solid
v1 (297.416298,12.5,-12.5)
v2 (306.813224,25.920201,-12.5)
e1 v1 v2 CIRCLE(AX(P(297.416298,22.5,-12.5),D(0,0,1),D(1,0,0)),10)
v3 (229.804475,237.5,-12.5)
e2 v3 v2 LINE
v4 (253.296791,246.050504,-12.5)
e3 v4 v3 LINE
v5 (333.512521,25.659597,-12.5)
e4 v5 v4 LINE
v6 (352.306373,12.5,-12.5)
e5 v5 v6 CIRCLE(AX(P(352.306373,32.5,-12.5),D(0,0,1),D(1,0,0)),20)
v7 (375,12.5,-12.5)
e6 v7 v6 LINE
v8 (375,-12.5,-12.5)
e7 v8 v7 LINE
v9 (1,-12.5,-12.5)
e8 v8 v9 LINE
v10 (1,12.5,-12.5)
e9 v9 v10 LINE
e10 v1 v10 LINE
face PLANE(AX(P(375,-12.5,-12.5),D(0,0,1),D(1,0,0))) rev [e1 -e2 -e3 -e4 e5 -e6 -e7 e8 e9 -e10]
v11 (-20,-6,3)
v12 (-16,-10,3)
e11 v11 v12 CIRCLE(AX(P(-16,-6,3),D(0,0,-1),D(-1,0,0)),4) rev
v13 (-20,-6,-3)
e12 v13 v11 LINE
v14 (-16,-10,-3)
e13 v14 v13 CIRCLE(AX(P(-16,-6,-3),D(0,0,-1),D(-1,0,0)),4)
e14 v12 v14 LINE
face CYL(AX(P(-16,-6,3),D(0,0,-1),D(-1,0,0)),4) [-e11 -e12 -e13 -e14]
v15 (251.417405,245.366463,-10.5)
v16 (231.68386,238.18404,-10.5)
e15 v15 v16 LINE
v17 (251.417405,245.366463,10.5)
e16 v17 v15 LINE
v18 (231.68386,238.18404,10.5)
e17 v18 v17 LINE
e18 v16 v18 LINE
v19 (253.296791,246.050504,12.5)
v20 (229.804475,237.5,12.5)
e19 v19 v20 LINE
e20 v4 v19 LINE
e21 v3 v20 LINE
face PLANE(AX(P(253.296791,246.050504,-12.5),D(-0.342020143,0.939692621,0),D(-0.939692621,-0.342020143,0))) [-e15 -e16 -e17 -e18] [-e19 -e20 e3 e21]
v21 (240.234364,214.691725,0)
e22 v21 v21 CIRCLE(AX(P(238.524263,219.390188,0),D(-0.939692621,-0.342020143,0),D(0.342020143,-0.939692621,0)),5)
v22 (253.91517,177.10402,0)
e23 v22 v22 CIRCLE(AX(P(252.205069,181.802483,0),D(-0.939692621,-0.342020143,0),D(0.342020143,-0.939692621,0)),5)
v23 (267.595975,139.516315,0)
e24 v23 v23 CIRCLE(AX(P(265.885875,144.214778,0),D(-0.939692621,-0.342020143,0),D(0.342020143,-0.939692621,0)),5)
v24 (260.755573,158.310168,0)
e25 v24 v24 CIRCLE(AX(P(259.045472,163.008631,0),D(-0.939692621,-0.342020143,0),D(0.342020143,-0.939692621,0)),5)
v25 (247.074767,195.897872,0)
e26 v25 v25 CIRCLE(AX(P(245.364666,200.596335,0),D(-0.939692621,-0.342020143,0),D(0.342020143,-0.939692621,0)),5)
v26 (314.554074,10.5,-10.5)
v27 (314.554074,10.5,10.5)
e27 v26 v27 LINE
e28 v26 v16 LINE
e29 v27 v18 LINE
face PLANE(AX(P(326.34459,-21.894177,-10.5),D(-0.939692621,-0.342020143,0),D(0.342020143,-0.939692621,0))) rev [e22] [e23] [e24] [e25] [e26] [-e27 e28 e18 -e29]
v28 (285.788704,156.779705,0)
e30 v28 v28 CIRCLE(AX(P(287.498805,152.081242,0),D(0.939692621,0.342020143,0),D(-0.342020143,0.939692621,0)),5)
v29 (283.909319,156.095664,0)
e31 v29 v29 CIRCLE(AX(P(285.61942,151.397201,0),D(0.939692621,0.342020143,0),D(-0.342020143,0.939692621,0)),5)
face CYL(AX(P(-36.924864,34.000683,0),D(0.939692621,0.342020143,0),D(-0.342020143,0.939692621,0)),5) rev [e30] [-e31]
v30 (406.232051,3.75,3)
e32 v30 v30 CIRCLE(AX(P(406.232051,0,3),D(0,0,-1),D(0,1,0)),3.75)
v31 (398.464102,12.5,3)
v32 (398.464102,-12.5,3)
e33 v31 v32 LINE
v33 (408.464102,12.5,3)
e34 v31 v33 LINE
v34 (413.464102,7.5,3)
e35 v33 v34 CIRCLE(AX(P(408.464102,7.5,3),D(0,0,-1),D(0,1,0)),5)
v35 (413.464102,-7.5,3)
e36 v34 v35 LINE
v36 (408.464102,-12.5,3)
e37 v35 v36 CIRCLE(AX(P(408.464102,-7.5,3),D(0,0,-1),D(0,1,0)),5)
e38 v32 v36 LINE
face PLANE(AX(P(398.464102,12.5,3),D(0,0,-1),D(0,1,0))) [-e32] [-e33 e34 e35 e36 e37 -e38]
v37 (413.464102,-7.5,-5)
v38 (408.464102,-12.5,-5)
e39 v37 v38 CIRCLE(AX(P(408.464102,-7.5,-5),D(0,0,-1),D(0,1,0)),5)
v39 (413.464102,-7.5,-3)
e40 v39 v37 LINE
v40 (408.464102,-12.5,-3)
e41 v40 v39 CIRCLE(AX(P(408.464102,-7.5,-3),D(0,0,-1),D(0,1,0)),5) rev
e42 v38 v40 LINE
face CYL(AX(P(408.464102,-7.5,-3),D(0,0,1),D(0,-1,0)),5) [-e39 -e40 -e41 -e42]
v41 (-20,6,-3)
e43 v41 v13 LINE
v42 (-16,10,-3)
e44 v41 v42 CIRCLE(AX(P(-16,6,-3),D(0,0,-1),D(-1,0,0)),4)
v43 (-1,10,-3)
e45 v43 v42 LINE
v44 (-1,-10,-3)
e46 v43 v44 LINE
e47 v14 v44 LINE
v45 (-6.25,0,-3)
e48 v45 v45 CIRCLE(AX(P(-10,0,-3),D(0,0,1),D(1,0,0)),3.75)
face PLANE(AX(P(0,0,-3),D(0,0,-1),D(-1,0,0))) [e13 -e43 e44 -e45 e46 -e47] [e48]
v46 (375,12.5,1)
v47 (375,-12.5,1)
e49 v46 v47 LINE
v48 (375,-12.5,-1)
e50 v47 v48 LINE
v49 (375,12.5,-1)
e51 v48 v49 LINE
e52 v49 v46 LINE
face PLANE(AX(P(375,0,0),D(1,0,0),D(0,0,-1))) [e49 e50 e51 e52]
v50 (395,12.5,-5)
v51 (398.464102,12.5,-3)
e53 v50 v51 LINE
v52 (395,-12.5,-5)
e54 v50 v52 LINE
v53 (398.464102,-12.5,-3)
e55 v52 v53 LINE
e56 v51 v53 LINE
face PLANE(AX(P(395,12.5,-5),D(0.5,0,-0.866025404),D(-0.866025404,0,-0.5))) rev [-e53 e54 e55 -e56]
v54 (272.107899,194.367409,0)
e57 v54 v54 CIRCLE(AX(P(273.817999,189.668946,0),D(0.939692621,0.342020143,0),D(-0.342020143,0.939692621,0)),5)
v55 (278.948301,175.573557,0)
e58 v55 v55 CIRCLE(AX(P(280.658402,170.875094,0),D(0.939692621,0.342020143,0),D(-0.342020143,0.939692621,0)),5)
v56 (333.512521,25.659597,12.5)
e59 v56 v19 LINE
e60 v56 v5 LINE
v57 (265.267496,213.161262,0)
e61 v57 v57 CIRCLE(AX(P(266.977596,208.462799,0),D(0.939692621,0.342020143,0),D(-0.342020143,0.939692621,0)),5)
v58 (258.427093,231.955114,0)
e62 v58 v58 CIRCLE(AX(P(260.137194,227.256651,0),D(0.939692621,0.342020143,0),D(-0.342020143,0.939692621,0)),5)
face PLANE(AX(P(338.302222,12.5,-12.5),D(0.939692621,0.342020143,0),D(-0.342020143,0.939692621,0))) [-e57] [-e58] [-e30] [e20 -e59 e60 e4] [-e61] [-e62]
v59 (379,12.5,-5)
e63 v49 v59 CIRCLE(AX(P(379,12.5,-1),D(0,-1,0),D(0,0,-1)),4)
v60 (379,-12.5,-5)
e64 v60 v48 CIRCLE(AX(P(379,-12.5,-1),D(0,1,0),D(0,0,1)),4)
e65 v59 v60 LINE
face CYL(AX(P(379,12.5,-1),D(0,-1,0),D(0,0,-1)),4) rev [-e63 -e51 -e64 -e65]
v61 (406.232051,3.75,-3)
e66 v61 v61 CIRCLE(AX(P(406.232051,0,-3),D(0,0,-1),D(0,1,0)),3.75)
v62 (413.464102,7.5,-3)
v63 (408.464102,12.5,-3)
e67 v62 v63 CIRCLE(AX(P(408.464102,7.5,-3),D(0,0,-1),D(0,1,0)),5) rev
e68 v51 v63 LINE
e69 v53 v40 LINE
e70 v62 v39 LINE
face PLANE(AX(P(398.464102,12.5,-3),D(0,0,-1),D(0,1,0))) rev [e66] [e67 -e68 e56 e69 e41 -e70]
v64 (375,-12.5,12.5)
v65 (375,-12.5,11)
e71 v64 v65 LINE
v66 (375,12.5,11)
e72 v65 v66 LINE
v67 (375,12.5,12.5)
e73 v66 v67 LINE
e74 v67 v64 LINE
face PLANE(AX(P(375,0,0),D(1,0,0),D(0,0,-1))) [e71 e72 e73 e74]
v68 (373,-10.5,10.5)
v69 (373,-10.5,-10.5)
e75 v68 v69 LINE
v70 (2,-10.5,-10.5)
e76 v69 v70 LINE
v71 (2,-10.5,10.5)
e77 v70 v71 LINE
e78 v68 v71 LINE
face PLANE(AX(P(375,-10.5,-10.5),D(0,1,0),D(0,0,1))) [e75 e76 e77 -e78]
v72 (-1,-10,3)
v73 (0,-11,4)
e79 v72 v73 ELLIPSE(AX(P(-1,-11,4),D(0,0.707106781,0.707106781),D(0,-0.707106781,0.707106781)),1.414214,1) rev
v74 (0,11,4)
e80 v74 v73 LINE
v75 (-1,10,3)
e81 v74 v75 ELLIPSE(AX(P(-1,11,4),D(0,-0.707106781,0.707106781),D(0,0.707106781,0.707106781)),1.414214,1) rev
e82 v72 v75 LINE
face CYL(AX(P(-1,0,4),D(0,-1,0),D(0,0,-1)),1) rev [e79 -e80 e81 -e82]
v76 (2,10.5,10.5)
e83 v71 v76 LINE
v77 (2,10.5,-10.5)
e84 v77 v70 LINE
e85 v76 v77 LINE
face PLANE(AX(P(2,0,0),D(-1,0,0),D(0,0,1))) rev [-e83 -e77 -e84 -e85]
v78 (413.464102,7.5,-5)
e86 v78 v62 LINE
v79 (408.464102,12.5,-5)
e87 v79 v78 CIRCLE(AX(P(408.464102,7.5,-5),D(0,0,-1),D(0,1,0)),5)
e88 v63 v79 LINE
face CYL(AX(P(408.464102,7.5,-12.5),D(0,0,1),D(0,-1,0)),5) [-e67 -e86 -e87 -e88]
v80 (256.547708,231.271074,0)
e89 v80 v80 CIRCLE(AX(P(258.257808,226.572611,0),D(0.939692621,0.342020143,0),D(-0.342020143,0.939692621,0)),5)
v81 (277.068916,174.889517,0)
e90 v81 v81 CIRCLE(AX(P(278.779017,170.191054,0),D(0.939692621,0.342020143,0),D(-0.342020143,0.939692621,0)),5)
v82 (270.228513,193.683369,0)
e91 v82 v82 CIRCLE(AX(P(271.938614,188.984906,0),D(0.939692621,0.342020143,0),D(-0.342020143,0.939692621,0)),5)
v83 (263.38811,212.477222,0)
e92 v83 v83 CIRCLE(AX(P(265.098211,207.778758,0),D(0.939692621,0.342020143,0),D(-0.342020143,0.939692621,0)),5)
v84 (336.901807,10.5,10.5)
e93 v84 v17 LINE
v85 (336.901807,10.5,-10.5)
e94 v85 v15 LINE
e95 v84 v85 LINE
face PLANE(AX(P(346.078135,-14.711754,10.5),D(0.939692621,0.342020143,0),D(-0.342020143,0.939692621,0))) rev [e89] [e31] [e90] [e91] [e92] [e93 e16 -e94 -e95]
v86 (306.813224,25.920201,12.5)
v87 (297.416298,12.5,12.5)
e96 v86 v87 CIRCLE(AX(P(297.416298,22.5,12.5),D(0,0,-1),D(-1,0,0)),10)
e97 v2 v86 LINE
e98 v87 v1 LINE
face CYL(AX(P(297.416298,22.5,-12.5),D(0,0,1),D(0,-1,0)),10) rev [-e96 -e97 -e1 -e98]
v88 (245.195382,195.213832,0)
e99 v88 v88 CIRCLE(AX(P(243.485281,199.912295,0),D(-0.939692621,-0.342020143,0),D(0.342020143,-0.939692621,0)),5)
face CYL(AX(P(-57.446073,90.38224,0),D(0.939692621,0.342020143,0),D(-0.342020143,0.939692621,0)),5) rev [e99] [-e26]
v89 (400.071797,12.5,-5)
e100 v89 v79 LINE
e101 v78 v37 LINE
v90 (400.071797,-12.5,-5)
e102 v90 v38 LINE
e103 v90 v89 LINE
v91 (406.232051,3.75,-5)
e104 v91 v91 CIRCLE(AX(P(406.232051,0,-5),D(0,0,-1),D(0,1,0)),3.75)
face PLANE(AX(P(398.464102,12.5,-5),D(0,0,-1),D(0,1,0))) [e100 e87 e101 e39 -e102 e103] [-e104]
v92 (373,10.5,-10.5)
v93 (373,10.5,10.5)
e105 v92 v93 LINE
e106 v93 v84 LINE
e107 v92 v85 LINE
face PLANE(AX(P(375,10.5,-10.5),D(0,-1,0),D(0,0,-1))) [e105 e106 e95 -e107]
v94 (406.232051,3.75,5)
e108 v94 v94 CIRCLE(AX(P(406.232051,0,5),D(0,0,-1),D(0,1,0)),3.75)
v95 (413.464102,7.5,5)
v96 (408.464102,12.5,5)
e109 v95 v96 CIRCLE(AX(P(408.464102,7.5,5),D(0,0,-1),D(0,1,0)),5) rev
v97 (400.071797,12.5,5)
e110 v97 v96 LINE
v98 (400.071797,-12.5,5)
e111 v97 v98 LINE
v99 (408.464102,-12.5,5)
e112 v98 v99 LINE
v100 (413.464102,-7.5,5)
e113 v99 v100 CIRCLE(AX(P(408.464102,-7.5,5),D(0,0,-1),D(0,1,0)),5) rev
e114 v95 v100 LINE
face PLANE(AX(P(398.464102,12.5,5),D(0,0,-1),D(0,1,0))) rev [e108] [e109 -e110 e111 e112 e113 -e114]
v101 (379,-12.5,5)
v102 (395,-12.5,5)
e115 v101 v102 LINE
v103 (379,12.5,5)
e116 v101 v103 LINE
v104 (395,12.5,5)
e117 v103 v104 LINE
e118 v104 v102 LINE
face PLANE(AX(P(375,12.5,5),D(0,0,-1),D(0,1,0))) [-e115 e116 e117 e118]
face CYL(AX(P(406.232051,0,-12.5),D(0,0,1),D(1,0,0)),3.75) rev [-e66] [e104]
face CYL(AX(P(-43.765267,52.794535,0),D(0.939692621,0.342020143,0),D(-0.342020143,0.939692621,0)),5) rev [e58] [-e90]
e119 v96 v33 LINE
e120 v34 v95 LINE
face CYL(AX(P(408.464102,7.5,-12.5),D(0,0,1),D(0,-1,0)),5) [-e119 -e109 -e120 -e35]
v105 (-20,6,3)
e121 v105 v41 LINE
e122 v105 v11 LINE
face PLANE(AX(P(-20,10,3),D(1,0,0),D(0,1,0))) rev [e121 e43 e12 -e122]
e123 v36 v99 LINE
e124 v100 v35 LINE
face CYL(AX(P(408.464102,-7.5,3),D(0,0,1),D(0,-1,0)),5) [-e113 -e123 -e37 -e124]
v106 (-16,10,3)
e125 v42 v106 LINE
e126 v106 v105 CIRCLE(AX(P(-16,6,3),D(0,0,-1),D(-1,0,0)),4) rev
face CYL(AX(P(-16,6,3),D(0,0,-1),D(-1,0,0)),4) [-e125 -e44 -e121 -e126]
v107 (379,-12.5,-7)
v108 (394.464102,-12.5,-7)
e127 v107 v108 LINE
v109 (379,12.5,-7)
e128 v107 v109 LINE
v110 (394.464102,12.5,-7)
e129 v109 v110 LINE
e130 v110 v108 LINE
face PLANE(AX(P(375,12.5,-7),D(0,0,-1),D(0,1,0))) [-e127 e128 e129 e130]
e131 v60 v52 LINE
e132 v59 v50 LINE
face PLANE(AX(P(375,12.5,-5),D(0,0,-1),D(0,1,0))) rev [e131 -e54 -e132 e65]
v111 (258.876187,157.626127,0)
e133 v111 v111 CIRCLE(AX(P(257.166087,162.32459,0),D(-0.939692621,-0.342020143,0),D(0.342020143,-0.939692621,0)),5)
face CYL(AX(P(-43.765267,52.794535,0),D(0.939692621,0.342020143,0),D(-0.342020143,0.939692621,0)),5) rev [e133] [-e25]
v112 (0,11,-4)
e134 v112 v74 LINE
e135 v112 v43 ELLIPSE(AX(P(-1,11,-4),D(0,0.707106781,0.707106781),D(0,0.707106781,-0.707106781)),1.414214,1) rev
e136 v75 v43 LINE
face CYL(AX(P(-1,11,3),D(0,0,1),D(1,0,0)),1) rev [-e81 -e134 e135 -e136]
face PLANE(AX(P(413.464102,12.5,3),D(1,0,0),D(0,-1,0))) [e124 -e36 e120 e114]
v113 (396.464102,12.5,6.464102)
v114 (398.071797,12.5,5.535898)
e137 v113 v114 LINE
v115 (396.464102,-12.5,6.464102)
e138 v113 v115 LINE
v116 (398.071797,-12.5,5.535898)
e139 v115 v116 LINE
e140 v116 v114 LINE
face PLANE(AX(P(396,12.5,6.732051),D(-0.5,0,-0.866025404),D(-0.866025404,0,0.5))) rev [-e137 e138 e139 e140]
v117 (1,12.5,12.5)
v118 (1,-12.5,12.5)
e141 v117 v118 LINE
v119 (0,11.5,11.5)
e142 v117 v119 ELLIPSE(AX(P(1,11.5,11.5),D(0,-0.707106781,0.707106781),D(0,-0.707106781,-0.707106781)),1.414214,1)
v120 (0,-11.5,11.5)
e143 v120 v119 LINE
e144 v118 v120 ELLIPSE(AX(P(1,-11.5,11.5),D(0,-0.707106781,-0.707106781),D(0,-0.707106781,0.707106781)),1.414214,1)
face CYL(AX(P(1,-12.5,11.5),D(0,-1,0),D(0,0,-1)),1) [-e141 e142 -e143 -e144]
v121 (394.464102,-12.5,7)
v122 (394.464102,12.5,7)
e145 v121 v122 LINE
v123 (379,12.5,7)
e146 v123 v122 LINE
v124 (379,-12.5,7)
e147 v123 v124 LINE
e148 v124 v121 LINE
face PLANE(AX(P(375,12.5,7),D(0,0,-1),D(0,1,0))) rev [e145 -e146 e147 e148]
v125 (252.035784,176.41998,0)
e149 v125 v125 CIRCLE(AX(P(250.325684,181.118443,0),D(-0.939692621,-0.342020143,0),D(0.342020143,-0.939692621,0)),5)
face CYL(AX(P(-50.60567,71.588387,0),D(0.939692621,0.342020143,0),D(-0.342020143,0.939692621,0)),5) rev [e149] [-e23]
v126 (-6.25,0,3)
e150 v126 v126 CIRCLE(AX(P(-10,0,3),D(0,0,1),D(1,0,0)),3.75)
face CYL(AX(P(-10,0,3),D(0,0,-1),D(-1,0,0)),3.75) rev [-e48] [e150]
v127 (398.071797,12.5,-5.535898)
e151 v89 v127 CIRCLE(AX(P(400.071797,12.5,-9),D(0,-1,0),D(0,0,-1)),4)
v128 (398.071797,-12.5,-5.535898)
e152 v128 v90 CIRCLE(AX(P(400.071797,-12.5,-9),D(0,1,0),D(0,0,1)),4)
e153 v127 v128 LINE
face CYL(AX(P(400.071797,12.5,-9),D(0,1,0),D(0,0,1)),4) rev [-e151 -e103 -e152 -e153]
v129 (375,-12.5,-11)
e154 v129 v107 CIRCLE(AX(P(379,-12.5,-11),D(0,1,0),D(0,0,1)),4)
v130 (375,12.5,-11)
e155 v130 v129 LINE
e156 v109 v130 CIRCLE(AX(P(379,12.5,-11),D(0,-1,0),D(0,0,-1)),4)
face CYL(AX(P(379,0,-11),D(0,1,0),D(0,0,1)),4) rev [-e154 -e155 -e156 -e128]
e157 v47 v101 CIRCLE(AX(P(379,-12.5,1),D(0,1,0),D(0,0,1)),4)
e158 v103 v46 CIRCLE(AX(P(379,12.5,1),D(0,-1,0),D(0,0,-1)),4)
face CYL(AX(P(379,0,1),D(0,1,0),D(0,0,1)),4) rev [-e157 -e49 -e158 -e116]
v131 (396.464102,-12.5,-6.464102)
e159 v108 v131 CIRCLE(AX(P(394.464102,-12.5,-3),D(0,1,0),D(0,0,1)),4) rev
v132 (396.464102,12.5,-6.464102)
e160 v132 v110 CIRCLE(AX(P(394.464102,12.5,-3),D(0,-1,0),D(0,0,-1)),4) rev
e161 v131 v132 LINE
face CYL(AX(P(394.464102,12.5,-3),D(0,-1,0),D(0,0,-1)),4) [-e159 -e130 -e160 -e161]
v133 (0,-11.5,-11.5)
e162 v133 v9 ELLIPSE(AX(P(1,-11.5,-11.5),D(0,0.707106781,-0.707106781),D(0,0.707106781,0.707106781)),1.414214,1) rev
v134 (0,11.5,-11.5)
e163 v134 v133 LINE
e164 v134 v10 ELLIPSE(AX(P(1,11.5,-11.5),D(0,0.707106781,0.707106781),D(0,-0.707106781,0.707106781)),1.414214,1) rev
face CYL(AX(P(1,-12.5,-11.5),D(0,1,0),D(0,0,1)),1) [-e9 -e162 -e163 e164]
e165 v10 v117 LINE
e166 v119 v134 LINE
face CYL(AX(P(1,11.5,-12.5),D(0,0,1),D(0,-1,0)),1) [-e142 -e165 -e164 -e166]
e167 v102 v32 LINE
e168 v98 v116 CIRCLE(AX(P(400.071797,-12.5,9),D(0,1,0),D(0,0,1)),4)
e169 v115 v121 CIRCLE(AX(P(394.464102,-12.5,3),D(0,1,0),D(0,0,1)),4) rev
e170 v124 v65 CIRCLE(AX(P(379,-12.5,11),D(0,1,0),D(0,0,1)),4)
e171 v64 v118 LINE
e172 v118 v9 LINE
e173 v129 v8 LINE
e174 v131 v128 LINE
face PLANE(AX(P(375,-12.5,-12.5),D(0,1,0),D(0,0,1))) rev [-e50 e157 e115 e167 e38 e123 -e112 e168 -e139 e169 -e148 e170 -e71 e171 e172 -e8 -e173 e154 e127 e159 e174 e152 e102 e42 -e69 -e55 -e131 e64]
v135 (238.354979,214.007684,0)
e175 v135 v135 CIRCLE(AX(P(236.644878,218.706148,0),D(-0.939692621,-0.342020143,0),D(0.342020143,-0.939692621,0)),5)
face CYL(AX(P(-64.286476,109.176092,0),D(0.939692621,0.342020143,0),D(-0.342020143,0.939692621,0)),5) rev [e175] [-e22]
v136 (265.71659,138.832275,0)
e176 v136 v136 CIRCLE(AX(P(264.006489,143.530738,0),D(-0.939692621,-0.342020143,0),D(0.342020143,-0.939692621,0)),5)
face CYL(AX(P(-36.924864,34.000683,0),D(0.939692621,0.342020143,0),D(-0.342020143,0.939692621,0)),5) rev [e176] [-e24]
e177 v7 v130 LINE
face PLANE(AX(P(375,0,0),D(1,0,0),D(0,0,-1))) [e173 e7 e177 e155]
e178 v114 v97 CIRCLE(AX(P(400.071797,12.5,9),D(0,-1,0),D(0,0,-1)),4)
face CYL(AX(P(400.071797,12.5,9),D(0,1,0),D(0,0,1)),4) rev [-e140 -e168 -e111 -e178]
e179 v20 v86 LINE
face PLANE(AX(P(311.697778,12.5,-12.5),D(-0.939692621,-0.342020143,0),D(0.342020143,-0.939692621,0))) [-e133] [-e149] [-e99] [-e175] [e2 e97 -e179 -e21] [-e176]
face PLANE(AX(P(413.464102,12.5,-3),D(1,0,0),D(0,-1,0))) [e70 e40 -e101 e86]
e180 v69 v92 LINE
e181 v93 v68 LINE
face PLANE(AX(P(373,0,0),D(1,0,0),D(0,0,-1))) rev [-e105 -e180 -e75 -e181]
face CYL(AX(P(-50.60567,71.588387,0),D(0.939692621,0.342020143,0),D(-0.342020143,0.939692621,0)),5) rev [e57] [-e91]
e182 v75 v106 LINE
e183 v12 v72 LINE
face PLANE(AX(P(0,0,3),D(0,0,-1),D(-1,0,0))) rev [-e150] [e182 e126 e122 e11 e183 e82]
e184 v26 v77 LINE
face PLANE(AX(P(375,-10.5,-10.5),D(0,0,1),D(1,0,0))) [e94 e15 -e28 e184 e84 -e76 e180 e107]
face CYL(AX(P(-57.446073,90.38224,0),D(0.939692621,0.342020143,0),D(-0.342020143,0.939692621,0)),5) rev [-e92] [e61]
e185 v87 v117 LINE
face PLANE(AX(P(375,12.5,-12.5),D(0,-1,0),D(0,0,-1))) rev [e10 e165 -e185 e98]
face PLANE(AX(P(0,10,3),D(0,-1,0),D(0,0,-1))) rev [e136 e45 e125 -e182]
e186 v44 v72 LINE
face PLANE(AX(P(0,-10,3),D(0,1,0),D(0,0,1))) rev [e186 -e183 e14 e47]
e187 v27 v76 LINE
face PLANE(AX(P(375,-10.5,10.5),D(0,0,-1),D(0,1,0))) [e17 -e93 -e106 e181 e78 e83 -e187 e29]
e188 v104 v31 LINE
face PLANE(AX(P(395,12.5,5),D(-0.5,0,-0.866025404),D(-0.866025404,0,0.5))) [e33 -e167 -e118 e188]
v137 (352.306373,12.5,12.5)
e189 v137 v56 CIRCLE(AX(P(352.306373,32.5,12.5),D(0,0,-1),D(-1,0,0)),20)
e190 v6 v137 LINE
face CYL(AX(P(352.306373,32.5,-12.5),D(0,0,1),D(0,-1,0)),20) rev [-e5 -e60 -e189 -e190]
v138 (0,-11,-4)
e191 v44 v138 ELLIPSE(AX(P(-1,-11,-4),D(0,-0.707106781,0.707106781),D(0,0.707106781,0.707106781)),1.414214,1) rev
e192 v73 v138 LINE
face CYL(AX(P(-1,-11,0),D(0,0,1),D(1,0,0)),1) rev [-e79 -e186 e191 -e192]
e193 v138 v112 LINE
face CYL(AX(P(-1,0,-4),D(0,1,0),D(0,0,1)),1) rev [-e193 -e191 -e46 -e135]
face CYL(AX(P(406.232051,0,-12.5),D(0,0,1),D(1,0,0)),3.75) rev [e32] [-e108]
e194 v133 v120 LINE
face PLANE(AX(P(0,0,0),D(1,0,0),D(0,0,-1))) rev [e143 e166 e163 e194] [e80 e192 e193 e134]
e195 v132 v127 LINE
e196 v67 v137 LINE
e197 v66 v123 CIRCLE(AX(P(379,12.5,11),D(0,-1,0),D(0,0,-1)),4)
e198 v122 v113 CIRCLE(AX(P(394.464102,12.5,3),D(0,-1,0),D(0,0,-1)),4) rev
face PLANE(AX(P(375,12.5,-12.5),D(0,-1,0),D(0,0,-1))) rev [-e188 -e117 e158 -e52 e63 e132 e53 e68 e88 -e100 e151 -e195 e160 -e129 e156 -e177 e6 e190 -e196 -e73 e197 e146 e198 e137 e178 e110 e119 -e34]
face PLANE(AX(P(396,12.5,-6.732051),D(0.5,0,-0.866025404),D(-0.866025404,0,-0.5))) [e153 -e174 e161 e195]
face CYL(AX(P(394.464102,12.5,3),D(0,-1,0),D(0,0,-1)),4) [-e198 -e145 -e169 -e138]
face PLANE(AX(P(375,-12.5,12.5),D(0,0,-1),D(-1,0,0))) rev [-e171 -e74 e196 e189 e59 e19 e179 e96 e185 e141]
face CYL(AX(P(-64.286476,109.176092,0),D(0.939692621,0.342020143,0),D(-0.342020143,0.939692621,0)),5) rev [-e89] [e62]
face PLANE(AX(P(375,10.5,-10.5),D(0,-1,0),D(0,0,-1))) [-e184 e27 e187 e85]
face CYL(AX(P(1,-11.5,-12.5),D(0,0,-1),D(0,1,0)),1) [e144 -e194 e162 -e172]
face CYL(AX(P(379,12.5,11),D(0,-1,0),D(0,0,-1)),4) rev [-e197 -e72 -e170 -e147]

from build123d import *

# Parameters (mm, degrees)
SKETCH1_W                = 25
SKETCH1_H                = 25
SKETCH1_W_2              = 21
SKETCH1_H_2              = 21
BOSS_EXTRUDE1_DEPTH      = 375
SKETCH2_W                = 25
SKETCH2_H                = 25
BOSS_EXTRUDE2_DEPTH      = 2
SKETCH3_W                = 20
SKETCH3_H                = 20
SKETCH3_R                = 3.75
BOSS_EXTRUDE3_DEPTH      = 3
FILLET1_R                = 1
FILLET2_R                = 4
BOSS_EXTRUDE4_DEPTH      = 12.5
BOSS_EXTRUDE4_DEPTH_BACK = 12.5
CUT_EXTRUDE1_REACH       = 451.804
SKETCH5_W                = 21
SKETCH5_H                = 21
FILLET3_R                = 20
FILLET4_R                = 10
SKETCH6_W                = 25
SKETCH6_H                = 25
BOSS_EXTRUDE5_DEPTH      = 2
THICKEN1_START           = -12.5
THICKEN1_DEPTH           = 25
THICKEN2_START           = -12.5
THICKEN2_DEPTH           = 25
CUT_EXTRUDE2_DEPTH       = 482.455775371
CUT_EXTRUDE2_DEPTH_BACK  = 482.455775371
SKETCH9_R                = 3.75
FILLET6_R                = 4
FILLET7_R                = 5
CUT_EXTRUDE3_DEPTH       = 351.398422086
CUT_EXTRUDE3_DEPTH_BACK  = 351.398422086
SKETCH10_R               = 5


# Read off the part's stored shape, not the designer's step: Thicken1, Thicken2
with BuildPart() as part:
    # Sketch1 → Boss-Extrude1 (new body)
    with BuildSketch(Plane(origin=(0, 0, 0), x_dir=(0, 0, -1), z_dir=(1, 0, 0))):
        Rectangle(SKETCH1_W, SKETCH1_H)
        Rectangle(SKETCH1_W_2, SKETCH1_H_2, mode=Mode.SUBTRACT)
    extrude(amount=BOSS_EXTRUDE1_DEPTH)

    # Sketch2 → Boss-Extrude2 (add)
    with BuildSketch(Plane.ZY):
        Rectangle(SKETCH2_W, SKETCH2_H)
    extrude(amount=-BOSS_EXTRUDE2_DEPTH)

    # Sketch3 → Boss-Extrude3 (add, symmetric)
    with BuildSketch(Plane.XY):
        with Locations((-10, 0)):
            Rectangle(SKETCH3_W, SKETCH3_H)
        with Locations((-10, 0)):
            Circle(SKETCH3_R, mode=Mode.SUBTRACT)
    extrude(amount=BOSS_EXTRUDE3_DEPTH, both=True)

    # Fillet1
    fillet1_edges = [part.edges().sort_by_distance(p)[0] for p in [
        (0, 12.5, 0),
        (0, 0, -12.5),
        (0, 0, 3),
        (0, 0, -3),
        (0, -10, 0),
        (0, 10, 0),
        (0, -12.5, 0),
        (0, 0, 12.5),
    ]]
    fillet(fillet1_edges, radius=FILLET1_R)

    # Fillet2
    fillet2_edges = [part.edges().sort_by_distance(p)[0] for p in [
        (-20, 10, 0),
        (-20, -10, 0),
    ]]
    fillet(fillet2_edges, radius=FILLET2_R)

    # Sketch4 → Boss-Extrude4 (add, two sides: drawn at the far end of the back side and taken through both)
    with BuildSketch(Plane.XY.offset(-BOSS_EXTRUDE4_DEPTH_BACK)):
        Polygon((338.302222156, 12.5), (253.296790654, 246.050503583), (229.804475134, 237.5), (311.697777844, 12.5), align=None)
    extrude(amount=BOSS_EXTRUDE4_DEPTH + BOSS_EXTRUDE4_DEPTH_BACK)

    # Cut-Extrude1: up to this plane
    cut_extrude1_end = Plane(origin=(375, 10.5, -10.5), z_dir=(0, -1, 0))
    # Sketch5 → Cut-Extrude1 (cut, up to the surface)
    with BuildSketch(Plane(origin=(-49.449011673, 135.860042987, 0), x_dir=(0, 0, 1), z_dir=(-0.3420201433256653, 0.9396926207859098, 0)), mode=Mode.PRIVATE) as cut_extrude1_sk1:
        with Locations((0, 309.675353547)):
            Rectangle(SKETCH5_W, SKETCH5_H)
    cut_extrude1_tool1 = split(extrude(cut_extrude1_sk1.sketch, amount=-CUT_EXTRUDE1_REACH, mode=Mode.PRIVATE), bisect_by=cut_extrude1_end, keep=Keep.BOTH, mode=Mode.PRIVATE)
    add(cut_extrude1_tool1.solids().sort_by_distance((241.550633, 241.775252, 0))[0], mode=Mode.SUBTRACT)

    # Fillet3
    fillet3_edges = [part.edges().sort_by_distance(p)[0] for p in [
        (338.302222156, 12.5, 0),
    ]]
    fillet(fillet3_edges, radius=FILLET3_R)

    # Fillet4
    fillet4_edges = [part.edges().sort_by_distance(p)[0] for p in [
        (311.697777844, 12.5, 0),
    ]]
    fillet(fillet4_edges, radius=FILLET4_R)

    # Sketch6 → Boss-Extrude5 (add)
    with BuildSketch(Plane(origin=(375, 0, 0), x_dir=(0, 0, -1), z_dir=(1, 0, 0))):
        Rectangle(SKETCH6_W, SKETCH6_H)
    extrude(amount=-BOSS_EXTRUDE5_DEPTH)

    # Thicken1 outline → Thicken1 (add)
    with BuildSketch(Plane(origin=(0, 0, 0), x_dir=(1, 0, 0), z_dir=(0, 1, 0)).offset(THICKEN1_START)):
        Polygon((398.464101615, 3), (413.464101615, 3), (413.464101615, 5), (399, 5), (395.535898385, 7), (375, 7), (375, 5), (395, 5), align=None)
    extrude(amount=THICKEN1_DEPTH)

    # Thicken2 outline → Thicken2 (add)
    with BuildSketch(Plane(origin=(0, 0, 0), x_dir=(1, 0, 0), z_dir=(0, 1, 0)).offset(THICKEN2_START)):
        Polygon((399, -5), (413.464101615, -5), (413.464101615, -3), (398.464101615, -3), (395, -5), (375, -5), (375, -7), (395.535898385, -7), align=None)
    extrude(amount=THICKEN2_DEPTH)

    # Sketch9 → Cut-Extrude2 (cut, two sides: drawn at the far end of the back side and taken through both)
    with BuildSketch(Plane.XY.offset(5).offset(-CUT_EXTRUDE2_DEPTH_BACK)):
        with Locations(Location((406.232050808, 0, 0), (0, 0, 90))):
            Circle(SKETCH9_R)
    extrude(amount=CUT_EXTRUDE2_DEPTH + CUT_EXTRUDE2_DEPTH_BACK, mode=Mode.SUBTRACT)

    # Fillet6
    fillet6_edges = [part.edges().sort_by_distance(p)[0] for p in [
        (375, 0, -7),
        (395.535898385, 0, -7),
        (399, 0, -5),
        (375, 0, -5),
        (375, 0, 5),
        (375, 0, 7),
        (395.535898385, 0, 7),
        (399, 0, 5),
    ]]
    fillet(fillet6_edges, radius=FILLET6_R)

    # Fillet7
    fillet7_edges = [part.edges().sort_by_distance(p)[0] for p in [
        (413.464101615, 12.5, -4),
        (413.464101615, -12.5, -4),
        (413.464101615, 12.5, 4),
        (413.464101615, -12.5, 4),
    ]]
    fillet(fillet7_edges, radius=FILLET7_R)

    # Sketch10 → Cut-Extrude3 (cut, two sides: drawn at the far end of the back side and taken through both)
    with BuildSketch(Plane(origin=(302.745802327, 110.190460596, 0), x_dir=(0, 0, -1), z_dir=(0.9396926207859093, 0.34202014332566627, 0)).offset(-CUT_EXTRUDE3_DEPTH_BACK)):
        with Locations(Location((0, 124.579237914, 0), (0, 0, 90))):
            Circle(SKETCH10_R)
        with Locations(Location((0, 104.579237914, 0), (0, 0, 90))):
            Circle(SKETCH10_R)
        with Locations(Location((0, 84.579237914, 0), (0, 0, 90))):
            Circle(SKETCH10_R)
        with Locations(Location((0, 64.579237914, 0), (0, 0, 90))):
            Circle(SKETCH10_R)
        with Locations(Location((0, 44.579237914, 0), (0, 0, 90))):
            Circle(SKETCH10_R)
    extrude(amount=CUT_EXTRUDE3_DEPTH + CUT_EXTRUDE3_DEPTH_BACK, mode=Mode.SUBTRACT)


solid = part.part
